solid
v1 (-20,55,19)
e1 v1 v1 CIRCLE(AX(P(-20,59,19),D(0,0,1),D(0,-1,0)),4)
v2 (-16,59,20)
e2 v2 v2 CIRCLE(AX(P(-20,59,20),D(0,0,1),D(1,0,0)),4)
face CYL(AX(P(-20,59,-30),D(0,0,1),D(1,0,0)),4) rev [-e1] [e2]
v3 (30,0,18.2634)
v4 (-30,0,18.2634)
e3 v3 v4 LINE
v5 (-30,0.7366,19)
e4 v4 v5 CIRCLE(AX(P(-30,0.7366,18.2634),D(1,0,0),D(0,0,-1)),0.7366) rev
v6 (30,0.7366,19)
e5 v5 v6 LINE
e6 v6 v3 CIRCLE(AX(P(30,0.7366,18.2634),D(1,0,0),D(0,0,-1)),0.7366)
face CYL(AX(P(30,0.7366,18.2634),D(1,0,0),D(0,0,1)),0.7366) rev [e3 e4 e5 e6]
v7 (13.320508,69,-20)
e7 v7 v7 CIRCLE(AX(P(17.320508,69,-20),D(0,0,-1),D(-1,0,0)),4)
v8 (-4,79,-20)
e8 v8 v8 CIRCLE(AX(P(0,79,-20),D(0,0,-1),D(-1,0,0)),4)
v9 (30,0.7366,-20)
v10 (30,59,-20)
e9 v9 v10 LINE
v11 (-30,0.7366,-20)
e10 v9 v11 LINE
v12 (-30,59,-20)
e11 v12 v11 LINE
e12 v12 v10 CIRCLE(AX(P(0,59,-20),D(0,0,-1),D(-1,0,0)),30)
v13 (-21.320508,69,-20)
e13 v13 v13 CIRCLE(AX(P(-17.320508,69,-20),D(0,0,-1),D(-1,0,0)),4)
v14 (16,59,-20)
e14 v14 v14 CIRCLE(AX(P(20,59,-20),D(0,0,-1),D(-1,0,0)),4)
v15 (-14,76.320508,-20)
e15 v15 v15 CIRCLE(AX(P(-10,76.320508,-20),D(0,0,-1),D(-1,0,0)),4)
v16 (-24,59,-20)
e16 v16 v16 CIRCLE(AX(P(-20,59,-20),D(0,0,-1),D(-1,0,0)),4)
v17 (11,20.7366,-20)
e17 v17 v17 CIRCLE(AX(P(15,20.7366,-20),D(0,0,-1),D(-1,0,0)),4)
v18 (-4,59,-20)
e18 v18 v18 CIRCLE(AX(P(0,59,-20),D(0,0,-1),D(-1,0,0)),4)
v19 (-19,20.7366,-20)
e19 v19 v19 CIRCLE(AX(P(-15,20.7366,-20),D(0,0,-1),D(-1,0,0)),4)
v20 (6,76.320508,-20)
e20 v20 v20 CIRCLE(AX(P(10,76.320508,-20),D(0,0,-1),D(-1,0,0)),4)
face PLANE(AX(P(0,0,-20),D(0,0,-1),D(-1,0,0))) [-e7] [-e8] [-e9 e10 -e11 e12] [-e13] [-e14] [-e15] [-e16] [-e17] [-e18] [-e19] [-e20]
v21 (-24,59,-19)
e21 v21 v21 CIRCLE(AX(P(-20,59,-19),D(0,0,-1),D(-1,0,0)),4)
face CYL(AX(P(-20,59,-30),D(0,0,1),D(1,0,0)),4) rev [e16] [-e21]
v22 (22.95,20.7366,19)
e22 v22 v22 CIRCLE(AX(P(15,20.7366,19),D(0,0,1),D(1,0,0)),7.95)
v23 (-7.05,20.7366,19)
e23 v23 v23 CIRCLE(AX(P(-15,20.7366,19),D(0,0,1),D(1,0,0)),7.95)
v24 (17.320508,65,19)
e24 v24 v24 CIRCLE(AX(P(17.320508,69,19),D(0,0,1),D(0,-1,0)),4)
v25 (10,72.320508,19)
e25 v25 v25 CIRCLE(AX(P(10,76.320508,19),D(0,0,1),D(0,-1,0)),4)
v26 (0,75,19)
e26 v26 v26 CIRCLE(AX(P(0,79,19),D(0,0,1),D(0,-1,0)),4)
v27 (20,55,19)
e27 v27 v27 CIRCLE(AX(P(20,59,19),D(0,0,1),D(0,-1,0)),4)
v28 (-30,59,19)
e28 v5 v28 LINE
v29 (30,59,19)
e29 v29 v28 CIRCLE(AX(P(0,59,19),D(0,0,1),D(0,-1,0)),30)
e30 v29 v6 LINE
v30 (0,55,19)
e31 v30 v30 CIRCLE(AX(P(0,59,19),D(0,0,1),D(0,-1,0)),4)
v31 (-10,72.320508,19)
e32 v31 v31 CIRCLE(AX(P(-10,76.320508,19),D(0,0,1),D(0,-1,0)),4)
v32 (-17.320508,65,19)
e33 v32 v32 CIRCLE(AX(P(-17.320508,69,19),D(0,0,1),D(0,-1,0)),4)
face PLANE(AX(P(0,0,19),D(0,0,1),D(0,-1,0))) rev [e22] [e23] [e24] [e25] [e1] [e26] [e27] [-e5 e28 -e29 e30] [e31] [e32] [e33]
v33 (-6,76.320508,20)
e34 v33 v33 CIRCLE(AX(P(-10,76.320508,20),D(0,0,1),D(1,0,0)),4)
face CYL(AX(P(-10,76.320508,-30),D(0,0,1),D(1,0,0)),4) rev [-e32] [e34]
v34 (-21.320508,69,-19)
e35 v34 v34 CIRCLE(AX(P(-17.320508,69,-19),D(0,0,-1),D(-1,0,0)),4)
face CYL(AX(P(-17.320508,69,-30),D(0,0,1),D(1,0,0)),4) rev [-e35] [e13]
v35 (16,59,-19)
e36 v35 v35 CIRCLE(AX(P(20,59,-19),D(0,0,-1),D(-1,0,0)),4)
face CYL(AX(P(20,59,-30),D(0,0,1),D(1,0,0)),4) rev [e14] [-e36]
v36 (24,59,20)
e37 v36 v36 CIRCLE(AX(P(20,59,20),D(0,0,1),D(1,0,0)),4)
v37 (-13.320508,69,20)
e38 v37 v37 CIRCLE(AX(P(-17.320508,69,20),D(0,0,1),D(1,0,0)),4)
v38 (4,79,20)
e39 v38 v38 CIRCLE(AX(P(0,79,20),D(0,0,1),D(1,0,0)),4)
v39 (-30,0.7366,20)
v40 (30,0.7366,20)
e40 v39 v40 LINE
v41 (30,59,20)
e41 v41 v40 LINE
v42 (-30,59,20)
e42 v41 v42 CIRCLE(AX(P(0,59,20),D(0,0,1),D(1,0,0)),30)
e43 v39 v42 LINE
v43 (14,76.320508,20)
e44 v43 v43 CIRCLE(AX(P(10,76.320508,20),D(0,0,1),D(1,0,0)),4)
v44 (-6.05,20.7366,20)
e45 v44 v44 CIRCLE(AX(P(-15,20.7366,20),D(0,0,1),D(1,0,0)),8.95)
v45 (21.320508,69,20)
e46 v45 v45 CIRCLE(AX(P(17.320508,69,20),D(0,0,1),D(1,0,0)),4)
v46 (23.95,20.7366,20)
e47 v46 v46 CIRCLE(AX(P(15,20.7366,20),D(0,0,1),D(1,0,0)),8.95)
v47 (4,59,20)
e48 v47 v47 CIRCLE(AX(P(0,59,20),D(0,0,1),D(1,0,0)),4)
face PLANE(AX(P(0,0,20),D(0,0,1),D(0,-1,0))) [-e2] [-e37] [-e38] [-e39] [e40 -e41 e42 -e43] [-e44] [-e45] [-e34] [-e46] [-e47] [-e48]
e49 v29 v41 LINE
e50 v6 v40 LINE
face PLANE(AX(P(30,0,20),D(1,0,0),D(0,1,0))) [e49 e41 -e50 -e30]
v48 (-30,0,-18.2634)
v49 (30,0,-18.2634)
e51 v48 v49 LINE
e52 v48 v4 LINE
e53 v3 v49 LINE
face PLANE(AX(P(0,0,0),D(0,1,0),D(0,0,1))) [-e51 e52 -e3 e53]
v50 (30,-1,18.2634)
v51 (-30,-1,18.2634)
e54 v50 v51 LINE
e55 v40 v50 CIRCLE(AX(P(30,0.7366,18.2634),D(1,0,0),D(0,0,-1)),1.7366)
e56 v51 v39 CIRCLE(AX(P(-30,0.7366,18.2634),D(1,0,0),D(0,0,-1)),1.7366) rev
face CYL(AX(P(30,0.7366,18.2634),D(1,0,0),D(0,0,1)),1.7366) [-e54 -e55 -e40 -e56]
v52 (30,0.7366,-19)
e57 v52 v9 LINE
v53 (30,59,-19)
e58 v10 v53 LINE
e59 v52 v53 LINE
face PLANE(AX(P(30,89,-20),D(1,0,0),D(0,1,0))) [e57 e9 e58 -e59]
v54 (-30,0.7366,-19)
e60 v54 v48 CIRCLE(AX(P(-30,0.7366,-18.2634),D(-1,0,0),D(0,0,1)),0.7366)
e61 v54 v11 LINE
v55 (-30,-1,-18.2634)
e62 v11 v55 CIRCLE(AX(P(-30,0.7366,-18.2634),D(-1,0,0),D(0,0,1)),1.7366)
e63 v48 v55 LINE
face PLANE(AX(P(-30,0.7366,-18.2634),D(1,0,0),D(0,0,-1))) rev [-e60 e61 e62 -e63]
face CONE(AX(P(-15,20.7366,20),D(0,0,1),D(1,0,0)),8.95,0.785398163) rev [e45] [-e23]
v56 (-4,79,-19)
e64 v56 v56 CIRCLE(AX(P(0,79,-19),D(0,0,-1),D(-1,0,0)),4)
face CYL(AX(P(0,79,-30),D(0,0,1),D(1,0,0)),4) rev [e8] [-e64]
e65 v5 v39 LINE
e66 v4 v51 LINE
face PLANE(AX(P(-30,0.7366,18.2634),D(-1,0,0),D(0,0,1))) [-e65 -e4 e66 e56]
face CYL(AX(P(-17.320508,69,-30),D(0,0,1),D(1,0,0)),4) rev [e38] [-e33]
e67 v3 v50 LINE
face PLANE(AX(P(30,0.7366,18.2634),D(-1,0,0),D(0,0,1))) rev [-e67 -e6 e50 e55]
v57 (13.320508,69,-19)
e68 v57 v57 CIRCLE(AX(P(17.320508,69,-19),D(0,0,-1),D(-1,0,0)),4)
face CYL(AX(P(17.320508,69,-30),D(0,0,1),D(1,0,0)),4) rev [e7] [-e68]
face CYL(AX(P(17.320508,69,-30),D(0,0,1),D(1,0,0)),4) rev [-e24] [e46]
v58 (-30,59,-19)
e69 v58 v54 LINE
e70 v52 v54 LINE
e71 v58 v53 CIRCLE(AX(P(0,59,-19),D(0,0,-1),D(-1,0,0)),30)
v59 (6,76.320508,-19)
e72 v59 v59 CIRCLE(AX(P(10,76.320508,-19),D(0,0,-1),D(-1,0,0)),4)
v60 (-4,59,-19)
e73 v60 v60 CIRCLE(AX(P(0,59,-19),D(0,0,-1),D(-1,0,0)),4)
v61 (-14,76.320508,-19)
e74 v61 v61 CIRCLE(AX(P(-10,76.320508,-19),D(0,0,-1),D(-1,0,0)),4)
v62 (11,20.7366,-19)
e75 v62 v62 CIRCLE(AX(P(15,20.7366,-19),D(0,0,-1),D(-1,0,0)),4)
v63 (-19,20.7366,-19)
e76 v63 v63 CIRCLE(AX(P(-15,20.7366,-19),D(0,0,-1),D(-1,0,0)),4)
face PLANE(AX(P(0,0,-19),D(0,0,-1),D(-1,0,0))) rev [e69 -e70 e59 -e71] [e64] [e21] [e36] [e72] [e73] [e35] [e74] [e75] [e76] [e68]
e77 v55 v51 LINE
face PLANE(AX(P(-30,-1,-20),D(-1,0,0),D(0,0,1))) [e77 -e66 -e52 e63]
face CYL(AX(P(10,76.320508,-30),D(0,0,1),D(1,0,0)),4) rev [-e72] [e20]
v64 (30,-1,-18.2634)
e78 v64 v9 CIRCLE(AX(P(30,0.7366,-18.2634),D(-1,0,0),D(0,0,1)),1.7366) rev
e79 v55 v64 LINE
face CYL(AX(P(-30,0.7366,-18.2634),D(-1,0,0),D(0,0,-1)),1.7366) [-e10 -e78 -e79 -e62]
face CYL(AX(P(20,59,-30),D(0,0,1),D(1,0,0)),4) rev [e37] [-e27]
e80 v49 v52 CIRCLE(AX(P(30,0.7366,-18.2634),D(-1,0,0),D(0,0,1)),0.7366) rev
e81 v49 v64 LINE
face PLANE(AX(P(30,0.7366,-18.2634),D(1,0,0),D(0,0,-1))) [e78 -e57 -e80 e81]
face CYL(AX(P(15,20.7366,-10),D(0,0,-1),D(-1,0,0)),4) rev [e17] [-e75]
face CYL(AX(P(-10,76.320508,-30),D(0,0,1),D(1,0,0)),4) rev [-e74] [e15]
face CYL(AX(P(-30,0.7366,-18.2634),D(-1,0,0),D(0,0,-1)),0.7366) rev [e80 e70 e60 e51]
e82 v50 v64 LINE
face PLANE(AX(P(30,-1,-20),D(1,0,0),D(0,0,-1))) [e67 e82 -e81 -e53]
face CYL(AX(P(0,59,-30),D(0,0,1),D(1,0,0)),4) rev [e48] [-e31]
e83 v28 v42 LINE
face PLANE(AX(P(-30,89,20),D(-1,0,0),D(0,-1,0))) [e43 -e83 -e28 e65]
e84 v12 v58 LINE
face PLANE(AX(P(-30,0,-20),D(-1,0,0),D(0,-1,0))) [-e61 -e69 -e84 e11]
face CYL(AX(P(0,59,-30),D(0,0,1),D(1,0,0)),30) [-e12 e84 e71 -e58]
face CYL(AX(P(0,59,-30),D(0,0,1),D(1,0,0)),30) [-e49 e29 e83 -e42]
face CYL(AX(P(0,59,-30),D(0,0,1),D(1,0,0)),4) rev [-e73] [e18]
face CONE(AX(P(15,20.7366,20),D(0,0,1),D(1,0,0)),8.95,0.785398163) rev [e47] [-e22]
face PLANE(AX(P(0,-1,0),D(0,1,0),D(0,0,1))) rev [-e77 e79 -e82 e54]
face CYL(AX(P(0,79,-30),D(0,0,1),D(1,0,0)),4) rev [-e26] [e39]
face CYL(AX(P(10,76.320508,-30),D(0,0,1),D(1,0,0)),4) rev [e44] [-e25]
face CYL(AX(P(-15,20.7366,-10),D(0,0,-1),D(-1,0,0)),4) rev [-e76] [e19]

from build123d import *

# Parameters (mm, degrees)
CROQUIS1_W                       = 60
CROQUIS1_H                       = 40
BRIDA_BASE2_DEPTH                = 1
BRIDA_DE_ARISTA1_STRIP_W         = 5.4732
BRIDA_DE_ARISTA1_STRIP_H         = 1
BRIDA_DE_ARISTA1_STRIP_CUT_DEPTH = 60
BRIDA_DE_ARISTA1_DEPTH           = 60
BRIDA_DE_ARISTA2_STRIP_W         = 5.4732
BRIDA_DE_ARISTA2_STRIP_H         = 1
BRIDA_DE_ARISTA2_STRIP_CUT_DEPTH = 60
BRIDA_DE_ARISTA2_DEPTH           = 60
CROQUIS17_R                      = 4
CORTAR_EXTRUIR1_DEPTH            = 50
CROQUIS18_R                      = 4
CORTAR_EXTRUIR2_DEPTH            = 10
CROQUIS19_R                      = 8.95
CORTAR_EXTRUIR3_DEPTH            = 1
CORTAR_EXTRUIR3_DRAFT            = -45
CORTAR_EXTRUIR3_PROFILE_2_DEPTH  = 1
CORTAR_EXTRUIR3_PROFILE_2_DRAFT  = -45


# Sheet-metal steps are written as plain solids
with BuildPart() as part:
    # Croquis1 → Brida base2 (new body)
    with BuildSketch(Plane(origin=(0, 0, 0), x_dir=(1, 0, 0), z_dir=(0, 1, 0))):
        Rectangle(CROQUIS1_W, CROQUIS1_H)
    extrude(amount=-BRIDA_BASE2_DEPTH)

    # Brida de arista1 strip (across the edge) → Brida de arista1 strip cut (cut)
    with BuildSketch(Plane(origin=(-30, 0, 20), x_dir=(0, 0, -1), z_dir=(1, 0, 0))):
        with Locations((-1, -0.5)):
            Rectangle(BRIDA_DE_ARISTA1_STRIP_W, BRIDA_DE_ARISTA1_STRIP_H)
    extrude(amount=BRIDA_DE_ARISTA1_STRIP_CUT_DEPTH, mode=Mode.SUBTRACT)

    # Brida de arista1 section (across the edge) → Brida de arista1 (add)
    with BuildSketch(Plane(origin=(-30, 0, 20), x_dir=(0, 0, -1), z_dir=(1, 0, 0))):
        with BuildLine():
            Line((0, 0.7366), (0, 89))
            Line((0, 89), (1, 89))
            Line((1, 89), (1, 0.7366))
            ThreePointArc((1, 0.7366), (1.215745145, 0.215745145), (1.7366, 0))
            Line((1.7366, 0), (1.7366, -1))
            ThreePointArc((1.7366, -1), (0.508638364, -0.491361636), (0, 0.7366))
        make_face()
    extrude(amount=BRIDA_DE_ARISTA1_DEPTH)

    # Brida de arista2 strip (across the edge) → Brida de arista2 strip cut (cut)
    with BuildSketch(Plane(origin=(30, 0, -20), x_dir=(0, 0, 1), z_dir=(-1, 0, 0))):
        with Locations((-1, -0.5)):
            Rectangle(BRIDA_DE_ARISTA2_STRIP_W, BRIDA_DE_ARISTA2_STRIP_H)
    extrude(amount=BRIDA_DE_ARISTA2_STRIP_CUT_DEPTH, mode=Mode.SUBTRACT)

    # Brida de arista2 section (across the edge) → Brida de arista2 (add)
    with BuildSketch(Plane(origin=(30, 0, -20), x_dir=(0, 0, 1), z_dir=(-1, 0, 0))):
        with BuildLine():
            Line((0, 0.7366), (0, 89))
            Line((0, 89), (1, 89))
            Line((1, 89), (1, 0.7366))
            ThreePointArc((1, 0.7366), (1.215745145, 0.215745145), (1.7366, 0))
            Line((1.7366, 0), (1.7366, -1))
            ThreePointArc((1.7366, -1), (0.508638364, -0.491361636), (0, 0.7366))
        make_face()
    extrude(amount=BRIDA_DE_ARISTA2_DEPTH)

    # Croquis17 → Cortar-Extruir1 (cut)
    with BuildSketch(Plane.XY.offset(20)):
        with BuildLine():
            ThreePointArc((-7.5e-08, 89), (21.213203409, 80.213203462), (30, 59))
            Line((30, 59), (30, 89))
            Line((30, 89), (-7.5e-08, 89))
        make_face()
        with BuildLine():
            ThreePointArc((-30, 59), (-21.213203462, 80.213203409), (-7.5e-08, 89))
            Line((-7.5e-08, 89), (-30, 89))
            Line((-30, 89), (-30, 59))
        make_face()
        with Locations(Location((0, 59, 0), (0, 0, 180))):
            Circle(CROQUIS17_R)
        with Locations(Location((20, 59, 0), (0, 0, 180))):
            Circle(CROQUIS17_R)
        with Locations(Location((10, 76.320508076, 0), (0, 0, 180))):
            Circle(CROQUIS17_R)
        with Locations(Location((17.320508076, 69, 0), (0, 0, 180))):
            Circle(CROQUIS17_R)
        with Locations(Location((0, 79, 0), (0, 0, 180))):
            Circle(CROQUIS17_R)
        with Locations(Location((-10, 76.320508076, 0), (0, 0, 180))):
            Circle(CROQUIS17_R)
        with Locations(Location((-17.320508076, 69, 0), (0, 0, 180))):
            Circle(CROQUIS17_R)
        with Locations(Location((-20, 59, 0), (0, 0, 180))):
            Circle(CROQUIS17_R)
    extrude(amount=-CORTAR_EXTRUIR1_DEPTH, mode=Mode.SUBTRACT)

    # Croquis18 → Cortar-Extruir2 (cut)
    with BuildSketch(Plane(origin=(0, 0, -20), x_dir=(-1, 0, 0), z_dir=(0, 0, -1))):
        with Locations((-15, 20.7366)):
            Circle(CROQUIS18_R)
        with Locations((15, 20.7366)):
            Circle(CROQUIS18_R)
    extrude(amount=-CORTAR_EXTRUIR2_DEPTH, mode=Mode.SUBTRACT)


with BuildPart() as cortar_extruir3_tool:
    # Croquis19 → Cortar-Extruir3 (with draft: the straight prism first)
    with BuildSketch(Plane.XY.offset(20)):
        with Locations((-15, 20.7366)):
            Circle(CROQUIS19_R)
    extrude(amount=-CORTAR_EXTRUIR3_DEPTH)
    # Cortar-Extruir3: the draft: its side faces are tilted about the plane it starts from
    cortar_extruir3_sides = [cortar_extruir3_tool.faces().sort_by_distance(p)[0] for p in [
        (-23.95, 20.7366, 19.5),
    ]]
    draft(cortar_extruir3_sides, Plane.XY.offset(20), CORTAR_EXTRUIR3_DRAFT)


with BuildPart() as part_1:
    add(part.part)

    # Cortar-Extruir3: cut by cortar_extruir3_tool
    add(cortar_extruir3_tool.part, mode=Mode.SUBTRACT)


with BuildPart() as cortar_extruir3_profile_2_tool:
    # Croquis19 → Cortar-Extruir3 profile 2 (with draft: the straight prism first)
    with BuildSketch(Plane.XY.offset(20)):
        with Locations((15, 20.7366)):
            Circle(CROQUIS19_R)
    extrude(amount=-CORTAR_EXTRUIR3_PROFILE_2_DEPTH)
    # Cortar-Extruir3 profile 2: the draft: its side faces are tilted about the plane it starts from
    cortar_extruir3_profile_2_sides = [cortar_extruir3_profile_2_tool.faces().sort_by_distance(p)[0] for p in [
        (6.05, 20.7366, 19.5),
    ]]
    draft(cortar_extruir3_profile_2_sides, Plane.XY.offset(20), CORTAR_EXTRUIR3_PROFILE_2_DRAFT)


with BuildPart() as part_2:
    add(part_1.part)

    # Cortar-Extruir3 profile 2: cut by cortar_extruir3_profile_2_tool
    add(cortar_extruir3_profile_2_tool.part, mode=Mode.SUBTRACT)


solid = part_2.part
